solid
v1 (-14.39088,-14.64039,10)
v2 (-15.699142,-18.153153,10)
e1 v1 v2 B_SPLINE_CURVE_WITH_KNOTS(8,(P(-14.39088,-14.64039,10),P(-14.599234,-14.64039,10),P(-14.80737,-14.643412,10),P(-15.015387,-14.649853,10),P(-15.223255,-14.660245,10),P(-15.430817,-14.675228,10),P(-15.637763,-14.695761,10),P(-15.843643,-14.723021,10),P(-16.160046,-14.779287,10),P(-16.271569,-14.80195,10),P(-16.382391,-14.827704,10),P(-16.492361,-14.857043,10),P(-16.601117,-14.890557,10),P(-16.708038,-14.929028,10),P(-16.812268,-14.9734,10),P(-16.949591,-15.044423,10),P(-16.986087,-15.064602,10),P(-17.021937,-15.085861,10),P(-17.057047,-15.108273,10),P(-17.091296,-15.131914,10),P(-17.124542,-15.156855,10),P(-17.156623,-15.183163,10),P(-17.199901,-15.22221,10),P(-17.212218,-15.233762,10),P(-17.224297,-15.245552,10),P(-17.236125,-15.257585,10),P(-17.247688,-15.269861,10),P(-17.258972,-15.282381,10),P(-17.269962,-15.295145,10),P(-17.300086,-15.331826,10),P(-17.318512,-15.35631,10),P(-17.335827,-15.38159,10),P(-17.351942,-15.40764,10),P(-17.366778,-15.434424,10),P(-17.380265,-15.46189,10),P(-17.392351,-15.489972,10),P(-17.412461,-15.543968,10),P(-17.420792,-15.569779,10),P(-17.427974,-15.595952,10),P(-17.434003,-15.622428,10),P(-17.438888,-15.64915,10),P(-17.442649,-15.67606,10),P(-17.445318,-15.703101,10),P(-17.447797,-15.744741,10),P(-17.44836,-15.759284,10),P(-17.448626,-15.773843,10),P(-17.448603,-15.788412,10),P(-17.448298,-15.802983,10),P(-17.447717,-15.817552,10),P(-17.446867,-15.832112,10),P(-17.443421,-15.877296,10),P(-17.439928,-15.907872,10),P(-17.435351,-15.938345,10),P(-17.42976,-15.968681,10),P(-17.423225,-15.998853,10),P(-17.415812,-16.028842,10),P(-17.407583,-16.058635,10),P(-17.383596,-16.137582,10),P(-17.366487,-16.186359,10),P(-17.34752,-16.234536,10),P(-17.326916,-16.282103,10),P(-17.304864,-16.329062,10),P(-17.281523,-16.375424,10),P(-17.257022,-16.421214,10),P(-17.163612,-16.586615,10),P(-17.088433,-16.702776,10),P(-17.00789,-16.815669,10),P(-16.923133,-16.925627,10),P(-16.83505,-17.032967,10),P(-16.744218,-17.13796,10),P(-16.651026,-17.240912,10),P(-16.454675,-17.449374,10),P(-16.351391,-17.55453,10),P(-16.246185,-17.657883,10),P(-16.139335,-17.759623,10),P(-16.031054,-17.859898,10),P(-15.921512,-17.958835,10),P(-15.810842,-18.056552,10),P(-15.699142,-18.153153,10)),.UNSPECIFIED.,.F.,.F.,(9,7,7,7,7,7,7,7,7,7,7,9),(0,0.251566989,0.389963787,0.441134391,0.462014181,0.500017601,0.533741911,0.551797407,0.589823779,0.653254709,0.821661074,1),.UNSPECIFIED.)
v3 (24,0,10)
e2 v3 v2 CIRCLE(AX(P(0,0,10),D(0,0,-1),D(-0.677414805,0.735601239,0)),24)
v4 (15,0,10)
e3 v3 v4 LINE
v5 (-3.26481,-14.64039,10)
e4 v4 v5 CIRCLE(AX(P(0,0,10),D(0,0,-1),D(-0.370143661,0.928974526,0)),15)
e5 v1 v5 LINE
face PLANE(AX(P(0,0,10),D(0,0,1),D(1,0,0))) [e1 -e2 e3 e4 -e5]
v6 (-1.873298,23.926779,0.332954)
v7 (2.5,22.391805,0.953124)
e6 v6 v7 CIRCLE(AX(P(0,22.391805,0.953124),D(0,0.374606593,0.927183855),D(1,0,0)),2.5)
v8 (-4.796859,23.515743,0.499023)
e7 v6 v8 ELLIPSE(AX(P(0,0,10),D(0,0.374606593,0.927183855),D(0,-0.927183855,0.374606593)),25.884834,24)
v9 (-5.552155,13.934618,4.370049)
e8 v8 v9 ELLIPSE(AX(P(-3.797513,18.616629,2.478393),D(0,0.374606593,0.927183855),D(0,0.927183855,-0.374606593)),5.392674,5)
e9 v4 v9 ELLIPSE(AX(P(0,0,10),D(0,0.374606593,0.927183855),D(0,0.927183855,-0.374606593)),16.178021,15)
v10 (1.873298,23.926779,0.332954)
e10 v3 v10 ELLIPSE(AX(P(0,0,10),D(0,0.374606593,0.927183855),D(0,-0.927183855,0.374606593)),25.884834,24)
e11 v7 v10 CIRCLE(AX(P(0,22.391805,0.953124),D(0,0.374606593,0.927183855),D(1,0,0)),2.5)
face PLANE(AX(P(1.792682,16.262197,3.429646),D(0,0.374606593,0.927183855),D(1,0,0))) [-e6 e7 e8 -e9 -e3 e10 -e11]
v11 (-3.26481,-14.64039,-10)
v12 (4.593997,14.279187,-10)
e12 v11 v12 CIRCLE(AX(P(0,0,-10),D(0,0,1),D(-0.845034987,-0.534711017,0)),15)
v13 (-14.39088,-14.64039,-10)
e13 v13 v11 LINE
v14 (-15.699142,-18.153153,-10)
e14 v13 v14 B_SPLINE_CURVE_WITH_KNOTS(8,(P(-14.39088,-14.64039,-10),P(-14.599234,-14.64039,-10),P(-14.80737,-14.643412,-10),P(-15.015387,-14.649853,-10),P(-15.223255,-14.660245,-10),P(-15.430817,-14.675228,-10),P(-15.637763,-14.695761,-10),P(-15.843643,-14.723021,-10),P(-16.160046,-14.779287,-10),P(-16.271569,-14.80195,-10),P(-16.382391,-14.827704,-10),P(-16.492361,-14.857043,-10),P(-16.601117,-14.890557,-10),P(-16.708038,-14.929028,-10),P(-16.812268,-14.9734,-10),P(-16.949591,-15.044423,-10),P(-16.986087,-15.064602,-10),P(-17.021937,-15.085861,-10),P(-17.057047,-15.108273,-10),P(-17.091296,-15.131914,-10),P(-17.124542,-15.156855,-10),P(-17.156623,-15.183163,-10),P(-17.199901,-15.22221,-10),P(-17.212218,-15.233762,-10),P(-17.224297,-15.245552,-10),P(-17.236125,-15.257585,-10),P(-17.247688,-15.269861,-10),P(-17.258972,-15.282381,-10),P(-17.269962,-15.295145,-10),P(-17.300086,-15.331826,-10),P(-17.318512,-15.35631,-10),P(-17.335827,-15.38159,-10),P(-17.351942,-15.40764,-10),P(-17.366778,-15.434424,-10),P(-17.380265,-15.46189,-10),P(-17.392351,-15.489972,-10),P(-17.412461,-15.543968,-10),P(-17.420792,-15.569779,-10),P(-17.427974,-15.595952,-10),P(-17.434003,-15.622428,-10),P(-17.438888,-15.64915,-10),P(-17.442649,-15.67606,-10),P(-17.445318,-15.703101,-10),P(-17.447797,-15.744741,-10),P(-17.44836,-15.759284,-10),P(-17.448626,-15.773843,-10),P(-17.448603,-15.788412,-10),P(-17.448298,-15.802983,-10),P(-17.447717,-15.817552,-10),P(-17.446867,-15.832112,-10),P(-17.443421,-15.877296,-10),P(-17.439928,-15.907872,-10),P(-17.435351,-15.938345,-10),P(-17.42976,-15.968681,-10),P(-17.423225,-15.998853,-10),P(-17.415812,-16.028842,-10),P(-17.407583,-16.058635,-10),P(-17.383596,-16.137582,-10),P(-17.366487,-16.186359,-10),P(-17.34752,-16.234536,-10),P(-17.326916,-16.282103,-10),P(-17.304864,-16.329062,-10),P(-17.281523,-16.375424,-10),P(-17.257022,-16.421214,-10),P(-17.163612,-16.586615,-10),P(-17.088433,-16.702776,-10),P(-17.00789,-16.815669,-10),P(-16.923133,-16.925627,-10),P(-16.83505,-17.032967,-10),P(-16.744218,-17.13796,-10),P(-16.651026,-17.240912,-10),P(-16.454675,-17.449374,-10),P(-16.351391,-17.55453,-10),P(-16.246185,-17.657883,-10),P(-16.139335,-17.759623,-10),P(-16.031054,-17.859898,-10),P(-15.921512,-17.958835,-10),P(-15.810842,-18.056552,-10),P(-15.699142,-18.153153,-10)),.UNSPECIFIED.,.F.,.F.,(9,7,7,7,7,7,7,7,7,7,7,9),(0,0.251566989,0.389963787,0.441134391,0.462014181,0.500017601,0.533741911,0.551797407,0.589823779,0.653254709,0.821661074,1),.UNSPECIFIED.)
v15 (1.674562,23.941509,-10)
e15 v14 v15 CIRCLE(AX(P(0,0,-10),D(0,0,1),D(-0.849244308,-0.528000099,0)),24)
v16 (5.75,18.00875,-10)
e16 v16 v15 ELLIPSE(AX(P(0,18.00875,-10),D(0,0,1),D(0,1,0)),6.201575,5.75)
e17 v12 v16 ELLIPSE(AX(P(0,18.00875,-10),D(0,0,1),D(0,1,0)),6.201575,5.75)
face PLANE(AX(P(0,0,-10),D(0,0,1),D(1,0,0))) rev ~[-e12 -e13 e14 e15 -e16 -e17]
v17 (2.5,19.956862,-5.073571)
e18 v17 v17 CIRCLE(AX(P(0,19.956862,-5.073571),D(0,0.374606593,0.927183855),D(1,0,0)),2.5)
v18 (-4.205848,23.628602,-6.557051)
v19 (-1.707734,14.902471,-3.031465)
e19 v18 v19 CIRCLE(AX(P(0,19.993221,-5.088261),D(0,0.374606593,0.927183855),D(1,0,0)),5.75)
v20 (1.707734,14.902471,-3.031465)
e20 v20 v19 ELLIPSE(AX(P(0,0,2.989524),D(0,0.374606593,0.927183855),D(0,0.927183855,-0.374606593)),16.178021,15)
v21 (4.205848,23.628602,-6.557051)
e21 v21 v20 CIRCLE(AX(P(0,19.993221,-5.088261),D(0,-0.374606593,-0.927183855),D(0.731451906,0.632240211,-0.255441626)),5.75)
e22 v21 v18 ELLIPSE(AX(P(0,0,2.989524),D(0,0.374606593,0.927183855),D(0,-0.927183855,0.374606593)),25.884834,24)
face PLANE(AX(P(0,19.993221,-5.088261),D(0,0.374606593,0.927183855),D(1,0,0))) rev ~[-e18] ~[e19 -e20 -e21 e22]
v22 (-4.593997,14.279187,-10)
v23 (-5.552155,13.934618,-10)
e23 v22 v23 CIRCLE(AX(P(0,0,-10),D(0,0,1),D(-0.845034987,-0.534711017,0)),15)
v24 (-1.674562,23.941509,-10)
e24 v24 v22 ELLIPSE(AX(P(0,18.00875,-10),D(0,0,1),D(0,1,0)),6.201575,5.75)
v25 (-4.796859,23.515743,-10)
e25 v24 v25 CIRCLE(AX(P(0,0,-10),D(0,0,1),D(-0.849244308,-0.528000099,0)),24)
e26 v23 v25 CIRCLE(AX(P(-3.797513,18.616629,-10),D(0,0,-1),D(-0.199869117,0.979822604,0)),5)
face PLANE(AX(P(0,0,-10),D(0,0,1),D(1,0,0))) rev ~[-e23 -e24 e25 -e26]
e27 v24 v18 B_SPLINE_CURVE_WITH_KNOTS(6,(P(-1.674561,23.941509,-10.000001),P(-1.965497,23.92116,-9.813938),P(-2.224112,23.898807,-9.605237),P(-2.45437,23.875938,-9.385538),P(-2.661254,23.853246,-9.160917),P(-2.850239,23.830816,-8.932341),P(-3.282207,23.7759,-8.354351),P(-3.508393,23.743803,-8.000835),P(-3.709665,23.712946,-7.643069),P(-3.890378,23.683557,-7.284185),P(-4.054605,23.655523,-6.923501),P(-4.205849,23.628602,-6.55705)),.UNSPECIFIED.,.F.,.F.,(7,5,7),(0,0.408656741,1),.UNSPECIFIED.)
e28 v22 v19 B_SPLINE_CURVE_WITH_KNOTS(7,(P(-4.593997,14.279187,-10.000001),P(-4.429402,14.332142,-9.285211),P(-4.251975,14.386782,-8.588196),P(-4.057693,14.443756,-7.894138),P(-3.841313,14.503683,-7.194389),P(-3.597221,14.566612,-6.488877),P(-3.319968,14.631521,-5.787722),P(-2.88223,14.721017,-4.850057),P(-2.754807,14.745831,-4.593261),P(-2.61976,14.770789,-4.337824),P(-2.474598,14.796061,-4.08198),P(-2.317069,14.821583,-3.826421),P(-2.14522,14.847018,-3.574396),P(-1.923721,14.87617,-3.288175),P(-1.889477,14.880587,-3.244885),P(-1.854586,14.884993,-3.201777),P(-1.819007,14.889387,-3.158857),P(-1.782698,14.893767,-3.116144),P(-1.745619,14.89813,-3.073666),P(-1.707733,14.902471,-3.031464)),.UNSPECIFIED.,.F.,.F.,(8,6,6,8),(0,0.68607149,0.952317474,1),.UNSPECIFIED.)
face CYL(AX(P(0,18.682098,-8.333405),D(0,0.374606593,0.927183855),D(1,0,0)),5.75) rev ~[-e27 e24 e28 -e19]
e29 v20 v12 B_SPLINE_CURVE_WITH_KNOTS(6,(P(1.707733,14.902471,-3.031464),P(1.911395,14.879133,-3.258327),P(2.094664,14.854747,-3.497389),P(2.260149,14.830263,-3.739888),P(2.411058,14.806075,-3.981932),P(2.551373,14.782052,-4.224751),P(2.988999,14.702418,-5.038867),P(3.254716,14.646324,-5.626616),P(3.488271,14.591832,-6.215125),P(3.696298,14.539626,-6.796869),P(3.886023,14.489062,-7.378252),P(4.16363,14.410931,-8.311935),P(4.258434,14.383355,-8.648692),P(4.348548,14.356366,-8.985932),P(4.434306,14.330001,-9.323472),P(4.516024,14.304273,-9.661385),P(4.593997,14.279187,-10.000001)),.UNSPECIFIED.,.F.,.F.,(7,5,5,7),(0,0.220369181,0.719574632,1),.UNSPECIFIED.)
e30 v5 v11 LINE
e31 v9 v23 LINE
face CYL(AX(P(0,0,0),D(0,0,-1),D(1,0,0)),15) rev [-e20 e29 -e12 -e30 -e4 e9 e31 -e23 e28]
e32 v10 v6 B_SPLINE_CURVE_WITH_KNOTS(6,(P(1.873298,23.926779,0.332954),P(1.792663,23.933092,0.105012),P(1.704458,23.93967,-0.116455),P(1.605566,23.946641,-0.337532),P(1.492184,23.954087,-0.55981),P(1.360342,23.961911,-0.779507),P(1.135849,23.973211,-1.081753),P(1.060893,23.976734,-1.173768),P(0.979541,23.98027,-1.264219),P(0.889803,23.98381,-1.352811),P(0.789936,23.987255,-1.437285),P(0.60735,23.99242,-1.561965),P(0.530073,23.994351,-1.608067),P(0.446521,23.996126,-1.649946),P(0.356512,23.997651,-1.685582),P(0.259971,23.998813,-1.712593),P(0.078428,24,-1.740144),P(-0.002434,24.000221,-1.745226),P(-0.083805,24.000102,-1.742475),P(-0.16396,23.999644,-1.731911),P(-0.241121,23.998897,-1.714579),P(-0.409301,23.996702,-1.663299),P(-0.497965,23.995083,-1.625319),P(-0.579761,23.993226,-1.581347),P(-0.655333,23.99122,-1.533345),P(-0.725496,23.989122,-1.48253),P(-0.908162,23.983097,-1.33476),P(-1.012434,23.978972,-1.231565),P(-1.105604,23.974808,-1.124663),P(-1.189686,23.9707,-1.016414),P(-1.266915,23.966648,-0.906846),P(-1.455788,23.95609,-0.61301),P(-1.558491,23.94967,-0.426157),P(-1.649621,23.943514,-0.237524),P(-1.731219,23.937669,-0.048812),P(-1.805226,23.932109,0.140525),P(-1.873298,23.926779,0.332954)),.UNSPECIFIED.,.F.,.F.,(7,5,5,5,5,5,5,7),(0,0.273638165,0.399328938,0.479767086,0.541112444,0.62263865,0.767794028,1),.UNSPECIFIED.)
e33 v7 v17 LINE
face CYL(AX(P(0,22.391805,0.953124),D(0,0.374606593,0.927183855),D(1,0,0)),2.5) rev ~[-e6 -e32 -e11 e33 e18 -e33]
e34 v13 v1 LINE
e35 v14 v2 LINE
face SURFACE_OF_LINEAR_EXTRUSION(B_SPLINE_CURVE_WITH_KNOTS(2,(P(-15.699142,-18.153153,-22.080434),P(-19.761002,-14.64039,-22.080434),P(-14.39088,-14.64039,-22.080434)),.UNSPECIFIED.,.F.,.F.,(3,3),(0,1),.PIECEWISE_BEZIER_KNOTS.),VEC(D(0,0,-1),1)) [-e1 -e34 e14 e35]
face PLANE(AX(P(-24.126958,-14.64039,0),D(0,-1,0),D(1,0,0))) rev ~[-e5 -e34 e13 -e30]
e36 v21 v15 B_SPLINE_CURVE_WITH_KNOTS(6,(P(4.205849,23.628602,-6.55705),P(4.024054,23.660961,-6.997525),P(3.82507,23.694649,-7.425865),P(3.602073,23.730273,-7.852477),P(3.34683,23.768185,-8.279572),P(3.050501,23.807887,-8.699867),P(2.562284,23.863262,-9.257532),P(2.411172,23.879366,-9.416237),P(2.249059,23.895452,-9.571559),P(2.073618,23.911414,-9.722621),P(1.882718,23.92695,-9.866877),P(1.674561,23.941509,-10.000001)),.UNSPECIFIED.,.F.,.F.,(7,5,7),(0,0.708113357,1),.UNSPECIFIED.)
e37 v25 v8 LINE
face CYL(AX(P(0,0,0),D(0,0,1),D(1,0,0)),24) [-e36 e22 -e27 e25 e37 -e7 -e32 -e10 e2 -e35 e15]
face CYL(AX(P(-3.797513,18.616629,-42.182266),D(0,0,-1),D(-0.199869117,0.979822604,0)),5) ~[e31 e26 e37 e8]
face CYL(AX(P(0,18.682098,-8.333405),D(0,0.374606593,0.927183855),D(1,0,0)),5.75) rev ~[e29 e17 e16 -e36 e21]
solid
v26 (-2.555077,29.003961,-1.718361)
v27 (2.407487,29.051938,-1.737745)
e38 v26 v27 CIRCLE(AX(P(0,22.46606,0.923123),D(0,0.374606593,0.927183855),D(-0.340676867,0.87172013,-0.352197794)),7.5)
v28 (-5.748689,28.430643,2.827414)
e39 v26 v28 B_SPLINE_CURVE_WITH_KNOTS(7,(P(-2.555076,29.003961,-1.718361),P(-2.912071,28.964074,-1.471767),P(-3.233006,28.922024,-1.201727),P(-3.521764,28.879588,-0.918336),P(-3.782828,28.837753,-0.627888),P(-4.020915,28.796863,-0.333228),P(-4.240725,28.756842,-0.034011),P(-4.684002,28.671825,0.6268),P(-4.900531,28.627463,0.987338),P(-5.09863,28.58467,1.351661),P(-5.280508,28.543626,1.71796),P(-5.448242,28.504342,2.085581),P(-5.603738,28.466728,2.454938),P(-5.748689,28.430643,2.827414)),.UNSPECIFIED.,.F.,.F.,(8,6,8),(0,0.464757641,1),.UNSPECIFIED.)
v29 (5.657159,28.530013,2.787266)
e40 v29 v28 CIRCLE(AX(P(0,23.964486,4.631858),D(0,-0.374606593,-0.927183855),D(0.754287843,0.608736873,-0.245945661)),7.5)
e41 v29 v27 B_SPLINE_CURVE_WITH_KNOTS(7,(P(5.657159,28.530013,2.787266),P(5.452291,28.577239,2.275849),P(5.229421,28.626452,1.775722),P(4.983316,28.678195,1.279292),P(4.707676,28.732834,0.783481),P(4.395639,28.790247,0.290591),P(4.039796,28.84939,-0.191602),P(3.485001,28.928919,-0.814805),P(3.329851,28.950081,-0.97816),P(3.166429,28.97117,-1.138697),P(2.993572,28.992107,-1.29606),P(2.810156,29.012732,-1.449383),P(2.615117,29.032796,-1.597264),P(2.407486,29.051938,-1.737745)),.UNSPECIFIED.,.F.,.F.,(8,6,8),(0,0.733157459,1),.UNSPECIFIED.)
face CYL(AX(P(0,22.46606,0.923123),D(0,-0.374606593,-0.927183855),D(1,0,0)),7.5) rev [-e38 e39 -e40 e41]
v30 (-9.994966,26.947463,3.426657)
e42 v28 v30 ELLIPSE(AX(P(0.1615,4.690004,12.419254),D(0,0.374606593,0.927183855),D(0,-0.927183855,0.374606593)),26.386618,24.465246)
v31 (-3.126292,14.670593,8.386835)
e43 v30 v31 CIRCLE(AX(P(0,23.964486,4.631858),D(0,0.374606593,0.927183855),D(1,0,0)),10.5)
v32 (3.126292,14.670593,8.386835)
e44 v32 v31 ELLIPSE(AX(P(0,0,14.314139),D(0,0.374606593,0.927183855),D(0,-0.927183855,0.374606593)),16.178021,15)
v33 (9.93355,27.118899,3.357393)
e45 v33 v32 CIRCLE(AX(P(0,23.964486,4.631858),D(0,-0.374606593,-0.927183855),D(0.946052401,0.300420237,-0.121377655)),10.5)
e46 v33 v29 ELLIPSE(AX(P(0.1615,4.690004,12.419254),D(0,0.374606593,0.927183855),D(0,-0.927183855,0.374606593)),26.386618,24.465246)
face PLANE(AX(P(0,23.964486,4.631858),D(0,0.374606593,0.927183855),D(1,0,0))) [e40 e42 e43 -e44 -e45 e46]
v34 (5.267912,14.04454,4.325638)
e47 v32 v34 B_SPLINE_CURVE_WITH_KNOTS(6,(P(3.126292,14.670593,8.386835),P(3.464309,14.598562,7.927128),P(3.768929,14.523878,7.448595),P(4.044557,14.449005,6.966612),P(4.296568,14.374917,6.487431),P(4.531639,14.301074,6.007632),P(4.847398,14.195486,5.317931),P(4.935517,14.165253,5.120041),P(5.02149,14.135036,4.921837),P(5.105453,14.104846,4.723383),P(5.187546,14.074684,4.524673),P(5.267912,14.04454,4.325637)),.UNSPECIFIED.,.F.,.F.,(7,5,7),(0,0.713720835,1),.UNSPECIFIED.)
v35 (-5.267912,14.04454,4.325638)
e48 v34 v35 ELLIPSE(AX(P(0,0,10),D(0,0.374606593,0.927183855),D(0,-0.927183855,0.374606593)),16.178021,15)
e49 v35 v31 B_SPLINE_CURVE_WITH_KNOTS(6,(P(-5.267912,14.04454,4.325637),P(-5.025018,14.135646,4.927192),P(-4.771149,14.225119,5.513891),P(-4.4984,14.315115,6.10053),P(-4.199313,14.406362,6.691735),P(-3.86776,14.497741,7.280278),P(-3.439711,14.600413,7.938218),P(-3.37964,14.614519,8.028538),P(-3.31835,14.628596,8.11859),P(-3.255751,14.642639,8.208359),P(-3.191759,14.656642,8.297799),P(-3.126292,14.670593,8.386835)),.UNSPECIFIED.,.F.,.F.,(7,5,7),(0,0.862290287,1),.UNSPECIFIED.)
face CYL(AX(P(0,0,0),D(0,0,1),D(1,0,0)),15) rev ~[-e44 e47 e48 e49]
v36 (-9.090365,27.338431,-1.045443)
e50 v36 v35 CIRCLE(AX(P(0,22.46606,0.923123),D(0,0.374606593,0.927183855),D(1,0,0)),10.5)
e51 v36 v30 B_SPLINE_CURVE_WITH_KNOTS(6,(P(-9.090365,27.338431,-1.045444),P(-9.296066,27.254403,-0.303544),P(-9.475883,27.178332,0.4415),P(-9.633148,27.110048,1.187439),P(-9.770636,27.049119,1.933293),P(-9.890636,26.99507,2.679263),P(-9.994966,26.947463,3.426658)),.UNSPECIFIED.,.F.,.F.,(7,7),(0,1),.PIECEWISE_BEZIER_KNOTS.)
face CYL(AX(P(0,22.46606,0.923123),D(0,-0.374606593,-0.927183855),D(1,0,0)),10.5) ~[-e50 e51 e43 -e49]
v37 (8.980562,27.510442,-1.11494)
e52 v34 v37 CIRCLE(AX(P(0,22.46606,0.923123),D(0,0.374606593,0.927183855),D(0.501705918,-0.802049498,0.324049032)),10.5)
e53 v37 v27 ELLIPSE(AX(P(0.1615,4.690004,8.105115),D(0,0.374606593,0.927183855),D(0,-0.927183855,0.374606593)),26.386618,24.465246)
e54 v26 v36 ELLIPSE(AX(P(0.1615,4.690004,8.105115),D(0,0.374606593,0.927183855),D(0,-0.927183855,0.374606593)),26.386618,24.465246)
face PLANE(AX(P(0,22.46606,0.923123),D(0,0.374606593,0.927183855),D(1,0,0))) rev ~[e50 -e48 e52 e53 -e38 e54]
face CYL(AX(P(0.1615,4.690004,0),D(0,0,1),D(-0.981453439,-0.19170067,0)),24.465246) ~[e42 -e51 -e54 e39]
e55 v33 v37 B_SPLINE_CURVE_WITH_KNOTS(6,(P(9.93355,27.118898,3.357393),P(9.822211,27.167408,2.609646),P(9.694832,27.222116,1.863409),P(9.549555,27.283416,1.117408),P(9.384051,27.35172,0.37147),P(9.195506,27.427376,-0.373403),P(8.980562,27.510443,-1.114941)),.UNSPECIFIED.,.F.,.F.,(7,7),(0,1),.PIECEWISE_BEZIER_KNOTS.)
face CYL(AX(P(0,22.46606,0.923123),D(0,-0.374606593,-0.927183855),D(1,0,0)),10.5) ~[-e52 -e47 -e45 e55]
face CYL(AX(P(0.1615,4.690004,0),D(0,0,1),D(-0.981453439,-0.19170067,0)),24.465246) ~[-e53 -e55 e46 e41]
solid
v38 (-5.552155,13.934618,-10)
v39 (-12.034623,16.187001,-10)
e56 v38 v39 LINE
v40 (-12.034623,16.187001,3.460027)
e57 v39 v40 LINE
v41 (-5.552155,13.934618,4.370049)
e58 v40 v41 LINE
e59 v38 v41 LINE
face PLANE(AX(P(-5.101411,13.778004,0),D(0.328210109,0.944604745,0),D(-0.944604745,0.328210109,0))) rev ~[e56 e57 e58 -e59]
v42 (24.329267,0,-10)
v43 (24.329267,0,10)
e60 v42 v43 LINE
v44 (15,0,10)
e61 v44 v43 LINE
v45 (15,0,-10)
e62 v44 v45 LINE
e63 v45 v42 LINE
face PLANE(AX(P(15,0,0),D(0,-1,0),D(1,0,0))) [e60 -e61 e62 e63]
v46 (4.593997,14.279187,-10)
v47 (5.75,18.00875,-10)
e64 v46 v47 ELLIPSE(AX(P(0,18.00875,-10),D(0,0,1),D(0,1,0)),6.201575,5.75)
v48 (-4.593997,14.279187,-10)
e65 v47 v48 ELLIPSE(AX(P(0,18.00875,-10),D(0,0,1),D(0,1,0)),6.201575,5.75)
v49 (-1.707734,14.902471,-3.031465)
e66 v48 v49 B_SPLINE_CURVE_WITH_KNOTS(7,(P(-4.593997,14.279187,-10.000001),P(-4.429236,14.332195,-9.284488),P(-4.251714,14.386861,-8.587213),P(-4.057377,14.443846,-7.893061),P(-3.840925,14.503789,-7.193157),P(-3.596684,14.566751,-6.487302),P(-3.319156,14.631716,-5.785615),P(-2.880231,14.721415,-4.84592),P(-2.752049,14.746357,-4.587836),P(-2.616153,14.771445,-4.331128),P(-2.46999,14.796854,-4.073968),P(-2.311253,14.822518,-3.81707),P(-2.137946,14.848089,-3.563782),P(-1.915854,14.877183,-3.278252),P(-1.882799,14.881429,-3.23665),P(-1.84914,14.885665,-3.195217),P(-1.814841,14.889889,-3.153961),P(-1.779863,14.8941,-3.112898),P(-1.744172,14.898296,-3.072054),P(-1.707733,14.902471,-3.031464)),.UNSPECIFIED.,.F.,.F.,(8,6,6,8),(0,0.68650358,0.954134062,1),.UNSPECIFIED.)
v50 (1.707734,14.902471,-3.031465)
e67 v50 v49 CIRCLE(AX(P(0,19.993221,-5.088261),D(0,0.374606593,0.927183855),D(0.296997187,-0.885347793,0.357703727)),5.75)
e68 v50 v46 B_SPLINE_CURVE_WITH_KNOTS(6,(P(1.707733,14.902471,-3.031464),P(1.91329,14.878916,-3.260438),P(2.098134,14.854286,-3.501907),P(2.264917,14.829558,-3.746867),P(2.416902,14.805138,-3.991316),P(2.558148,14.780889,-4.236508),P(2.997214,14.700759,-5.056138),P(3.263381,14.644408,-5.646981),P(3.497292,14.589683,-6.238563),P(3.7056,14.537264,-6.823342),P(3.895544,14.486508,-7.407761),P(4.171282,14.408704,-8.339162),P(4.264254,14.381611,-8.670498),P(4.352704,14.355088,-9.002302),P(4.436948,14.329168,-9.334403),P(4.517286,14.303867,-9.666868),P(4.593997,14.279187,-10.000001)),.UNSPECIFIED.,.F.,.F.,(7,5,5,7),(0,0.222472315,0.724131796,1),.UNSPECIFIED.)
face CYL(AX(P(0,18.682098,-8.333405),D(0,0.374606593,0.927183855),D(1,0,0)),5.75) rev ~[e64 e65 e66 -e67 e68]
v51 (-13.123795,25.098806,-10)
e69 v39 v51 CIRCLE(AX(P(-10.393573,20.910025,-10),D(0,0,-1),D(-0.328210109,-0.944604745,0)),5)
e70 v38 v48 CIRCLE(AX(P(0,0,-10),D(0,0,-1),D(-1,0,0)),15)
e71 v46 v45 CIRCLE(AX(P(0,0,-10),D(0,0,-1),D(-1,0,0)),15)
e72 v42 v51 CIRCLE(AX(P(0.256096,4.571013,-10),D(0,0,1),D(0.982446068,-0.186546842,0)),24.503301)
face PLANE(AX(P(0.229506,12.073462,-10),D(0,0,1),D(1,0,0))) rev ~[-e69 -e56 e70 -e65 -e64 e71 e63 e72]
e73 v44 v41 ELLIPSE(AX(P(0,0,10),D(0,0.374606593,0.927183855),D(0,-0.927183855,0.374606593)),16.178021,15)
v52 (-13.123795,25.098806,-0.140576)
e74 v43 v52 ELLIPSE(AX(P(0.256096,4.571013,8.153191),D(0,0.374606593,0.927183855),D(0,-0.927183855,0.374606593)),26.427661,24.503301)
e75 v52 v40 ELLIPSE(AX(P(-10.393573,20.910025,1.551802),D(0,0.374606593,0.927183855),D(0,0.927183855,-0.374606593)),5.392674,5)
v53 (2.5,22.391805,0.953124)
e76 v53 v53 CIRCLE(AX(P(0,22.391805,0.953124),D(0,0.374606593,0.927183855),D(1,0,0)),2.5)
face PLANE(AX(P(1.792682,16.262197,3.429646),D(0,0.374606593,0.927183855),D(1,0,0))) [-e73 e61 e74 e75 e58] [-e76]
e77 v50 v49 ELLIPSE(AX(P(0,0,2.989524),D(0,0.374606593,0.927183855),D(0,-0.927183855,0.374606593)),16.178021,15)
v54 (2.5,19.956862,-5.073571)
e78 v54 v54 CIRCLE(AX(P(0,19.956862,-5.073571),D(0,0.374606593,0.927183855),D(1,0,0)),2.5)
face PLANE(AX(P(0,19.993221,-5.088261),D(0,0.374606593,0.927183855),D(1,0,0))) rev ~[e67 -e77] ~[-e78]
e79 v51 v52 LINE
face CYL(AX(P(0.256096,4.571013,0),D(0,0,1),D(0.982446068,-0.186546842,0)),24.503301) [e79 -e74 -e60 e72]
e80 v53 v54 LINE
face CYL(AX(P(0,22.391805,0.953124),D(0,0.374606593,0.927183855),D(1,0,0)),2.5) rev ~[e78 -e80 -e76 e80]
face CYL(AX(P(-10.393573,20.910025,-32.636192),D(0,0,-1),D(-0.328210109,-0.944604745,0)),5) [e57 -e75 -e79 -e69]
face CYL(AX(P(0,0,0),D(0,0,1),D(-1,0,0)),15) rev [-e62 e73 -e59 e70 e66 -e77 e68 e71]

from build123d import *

# Parameters (mm, degrees)
F1_DEPTH       = 10
F2_R           = 24
F2_R_2         = 15
F3_DEPTH       = 10
F5_DEPTH       = 12.5
F6_W           = 22.41528593
F6_H           = 10.1995486766
F7_DEPTH       = 12.5
F12_W          = 51.7317093909
F12_H          = 35.3548980784
F13_DEPTH      = 25
F15_R          = 2.5
F16_DEPTH      = 15
F17_R          = 10.5
F17_R_2        = 7.5
F18_DEPTH      = 4
F19_W          = 61.2675081939
F19_H          = 44.7931201197
F20_DEPTH      = 12.5
F23_T1_DEPTH   = 57.6612211781
F23_2_T1_DEPTH = 77.2316796631
F24_T1_DEPTH   = 44.1608674747
F26_R          = 5.75
F27_DEPTH      = 3.5


# Not quite as in the source:
# - a fillet or chamfer that OpenCascade refuses, or shapes differently, is made with other operations: its cross-section is extruded or revolved along the edge and cut away or added


with BuildPart() as f1:
    # F0 (on Top) → F1 (new body, symmetric)
    with BuildSketch(Plane.XY):
        with BuildLine():
            Line((15, 0), (24.3292674422, 0))
            ThreePointArc((24.3292674422, 0), (0.2560960129, 29.0743140694), (-23.8170754164, 0))
            Line((-23.8170754164, 0), (-15, 0))
            ThreePointArc((-15, 0), (0, 15), (15, 0))
        make_face()
    extrude(amount=F1_DEPTH, both=True)


with BuildPart() as f3:
    # F2 (on Top) → F3 (new body, symmetric)
    with BuildSketch(Plane.XY):
        Circle(F2_R)
        Circle(F2_R_2, mode=Mode.SUBTRACT)
    extrude(amount=F3_DEPTH, both=True)


with BuildPart() as f5:
    # F4 (on Top) → F5 (new body, symmetric)
    with BuildSketch(Plane.XY):
        Polygon((-14.9477146361, -14.5601387329), (-5.1014113761, 13.7780036218), (-24.9381110243, 20.6704159038), (-34.7844142843, -7.6677264509), align=None)
    extrude(amount=F5_DEPTH, both=True)


with BuildPart() as f7:
    # F6 (on Top) → F7 (new body, symmetric)
    with BuildSketch(Plane.XY):
        with Locations((-12.919315137, -9.5406156033)):
            Rectangle(F6_W, F6_H)
    extrude(amount=F7_DEPTH, both=True)


with BuildPart() as f1_1:
    add(f1.part)

    # F8: cut F5, F7
    add(f5.part, mode=Mode.SUBTRACT)
    add(f7.part, mode=Mode.SUBTRACT)


with BuildPart() as f3_1:
    add(f3.part)

    # F8: cut F5, F7
    add(f5.part, mode=Mode.SUBTRACT)
    add(f7.part, mode=Mode.SUBTRACT)


with BuildPart() as f13:
    # F12 (on face) → F13 (new body)
    with BuildSketch(Plane(origin=(0, 3.4732918523, 8.5966990017), x_dir=(1, 0, 0), z_dir=(0, 0.3746065934, 0.9271838546))):
        with Locations((1.7926823348, 13.7932781363)):
            Rectangle(F12_W, F12_H)
    extrude(amount=F13_DEPTH)


with BuildPart() as f3_2:
    add(f3_1.part)

    # F14: cut F13
    add(f13.part, mode=Mode.SUBTRACT)


with BuildPart() as f1_2:
    add(f1_1.part)

    # F14: cut F13
    add(f13.part, mode=Mode.SUBTRACT)


with BuildPart() as f16:
    # F15 (on face) → F16 (new body)
    with BuildSketch(Plane(origin=(0, 3.4732918523, 8.5966990017), x_dir=(1, 0, 0), z_dir=(0, 0.3746065934, 0.9271838546))):
        with Locations((0, 20.4042736441)):
            Circle(F15_R)
    extrude(amount=-F16_DEPTH)


with BuildPart() as f18:
    # F17 (on face) → F18 (new body)
    with BuildSketch(Plane(origin=(0, 3.4732918523, 8.5966990017), x_dir=(1, 0, 0), z_dir=(0, 0.3746065934, 0.9271838546))):
        with Locations((0, 20.4843599349)):
            Circle(F17_R)
        with Locations((0, 20.4843599349)):
            Circle(F17_R_2, mode=Mode.SUBTRACT)
    extrude(amount=F18_DEPTH)


with BuildPart() as f20:
    # F19 (on Top) → F20 (new body, symmetric)
    with BuildSketch(Plane.XY):
        with Locations((-0.9692432359, 18.0722444784)):
            Rectangle(F19_W, F19_H)
        with BuildLine():
            Line((24.173, 0), (15, 0))
            ThreePointArc((15, 0), (0, 15), (-15, 0))
            Line((-15, 0), (-23.85, 0))
            ThreePointArc((-23.85, 0), (0.1615, 29.1552502712), (24.173, 0))
        make_face(mode=Mode.SUBTRACT)
    extrude(amount=F20_DEPTH, both=True)


with BuildPart() as f18_1:
    add(f18.part)

    # F21: cut F20
    add(f20.part, mode=Mode.SUBTRACT)


with BuildPart() as f1_3:
    add(f1_2.part)

    # F22: cut F16
    add(f16.part, mode=Mode.SUBTRACT)

    # F23: fillet of radius 5 on 1 edges, made by hand

    # F23_s2 → F23_t1 (cut)
    with BuildSketch(Plane.XY.offset(-32.6361921936)):
        with BuildLine():
            ThreePointArc((-12.0346234612, 16.1870009336), (-15.3566437884, 20.3034543546), (-13.1237951218, 25.0988057133))
            ThreePointArc((-13.1237951218, 25.0988057133), (-16.6861637402, 22.273317734), (-19.6651630599, 18.8382899979))
            Line((-19.6651630599, 18.8382899979), (-12.0346234612, 16.1870009336))
        make_face()
    extrude(amount=F23_T1_DEPTH, mode=Mode.SUBTRACT)


with BuildPart() as f3_3:
    add(f3_2.part)

    # F22: cut F16
    add(f16.part, mode=Mode.SUBTRACT)

    # F23#2: fillet of radius 5 on 1 edges, made by hand

    # F23_2_s2 → F23_2_t1 (cut)
    with BuildSketch(Plane.XY.offset(-42.1822661383)):
        with BuildLine():
            ThreePointArc((-4.7968588028, 23.5157425064), (-8.7820491741, 19.009568806), (-5.5521549108, 13.9346178938))
            Line((-5.5521549108, 13.9346178938), (-16.2579553104, 17.654429731))
            ThreePointArc((-16.2579553104, 17.654429731), (-10.9277191672, 21.3678486002), (-4.7968588028, 23.5157425064))
        make_face()
    extrude(amount=F23_2_T1_DEPTH, mode=Mode.SUBTRACT)

    # F24: fillet of radius 2 on 1 edges, made by hand

    # F24_s2 → F24_t1 (cut)
    with BuildSketch(Plane.XY.offset(-22.0804337374)):
        with BuildLine():
            add(Edge.make_bspline(
                [(-15.6991416444, -18.1531526636), (-19.7610018026, -14.6403899416), (-14.3908798407, -14.6403899416)],
                knots=[0, 0, 0, 1, 1, 1], degree=2, weights=[1, 1, 1]))
            Line((-14.3908798407, -14.6403899416), (-19.0173337342, -14.6403899416))
            ThreePointArc((-19.0173337342, -14.6403899416), (-17.4468705264, -16.4804947995), (-15.6991416444, -18.1531526636))
        make_face()
    extrude(amount=F24_T1_DEPTH, mode=Mode.SUBTRACT)


with BuildPart() as f27:
    # F26 (on offset) → F27 (new body, symmetric)
    with BuildSketch(Plane(origin=(0, -0.2727740819, -0.675139544), x_dir=(1, 0, 0), z_dir=(0, 0.3746065934, 0.9271838546))):
        with Locations((0, 20.4434879124)):
            Circle(F26_R)
    extrude(amount=F27_DEPTH, both=True)


with BuildPart() as f1_4:
    add(f1_3.part)

    # F28: cut F27
    add(f27.part, mode=Mode.SUBTRACT)


with BuildPart() as f3_4:
    add(f3_3.part)

    # F28: cut F27
    add(f27.part, mode=Mode.SUBTRACT)


solid = Compound([f18_1.part, f1_4.part, f3_4.part])
